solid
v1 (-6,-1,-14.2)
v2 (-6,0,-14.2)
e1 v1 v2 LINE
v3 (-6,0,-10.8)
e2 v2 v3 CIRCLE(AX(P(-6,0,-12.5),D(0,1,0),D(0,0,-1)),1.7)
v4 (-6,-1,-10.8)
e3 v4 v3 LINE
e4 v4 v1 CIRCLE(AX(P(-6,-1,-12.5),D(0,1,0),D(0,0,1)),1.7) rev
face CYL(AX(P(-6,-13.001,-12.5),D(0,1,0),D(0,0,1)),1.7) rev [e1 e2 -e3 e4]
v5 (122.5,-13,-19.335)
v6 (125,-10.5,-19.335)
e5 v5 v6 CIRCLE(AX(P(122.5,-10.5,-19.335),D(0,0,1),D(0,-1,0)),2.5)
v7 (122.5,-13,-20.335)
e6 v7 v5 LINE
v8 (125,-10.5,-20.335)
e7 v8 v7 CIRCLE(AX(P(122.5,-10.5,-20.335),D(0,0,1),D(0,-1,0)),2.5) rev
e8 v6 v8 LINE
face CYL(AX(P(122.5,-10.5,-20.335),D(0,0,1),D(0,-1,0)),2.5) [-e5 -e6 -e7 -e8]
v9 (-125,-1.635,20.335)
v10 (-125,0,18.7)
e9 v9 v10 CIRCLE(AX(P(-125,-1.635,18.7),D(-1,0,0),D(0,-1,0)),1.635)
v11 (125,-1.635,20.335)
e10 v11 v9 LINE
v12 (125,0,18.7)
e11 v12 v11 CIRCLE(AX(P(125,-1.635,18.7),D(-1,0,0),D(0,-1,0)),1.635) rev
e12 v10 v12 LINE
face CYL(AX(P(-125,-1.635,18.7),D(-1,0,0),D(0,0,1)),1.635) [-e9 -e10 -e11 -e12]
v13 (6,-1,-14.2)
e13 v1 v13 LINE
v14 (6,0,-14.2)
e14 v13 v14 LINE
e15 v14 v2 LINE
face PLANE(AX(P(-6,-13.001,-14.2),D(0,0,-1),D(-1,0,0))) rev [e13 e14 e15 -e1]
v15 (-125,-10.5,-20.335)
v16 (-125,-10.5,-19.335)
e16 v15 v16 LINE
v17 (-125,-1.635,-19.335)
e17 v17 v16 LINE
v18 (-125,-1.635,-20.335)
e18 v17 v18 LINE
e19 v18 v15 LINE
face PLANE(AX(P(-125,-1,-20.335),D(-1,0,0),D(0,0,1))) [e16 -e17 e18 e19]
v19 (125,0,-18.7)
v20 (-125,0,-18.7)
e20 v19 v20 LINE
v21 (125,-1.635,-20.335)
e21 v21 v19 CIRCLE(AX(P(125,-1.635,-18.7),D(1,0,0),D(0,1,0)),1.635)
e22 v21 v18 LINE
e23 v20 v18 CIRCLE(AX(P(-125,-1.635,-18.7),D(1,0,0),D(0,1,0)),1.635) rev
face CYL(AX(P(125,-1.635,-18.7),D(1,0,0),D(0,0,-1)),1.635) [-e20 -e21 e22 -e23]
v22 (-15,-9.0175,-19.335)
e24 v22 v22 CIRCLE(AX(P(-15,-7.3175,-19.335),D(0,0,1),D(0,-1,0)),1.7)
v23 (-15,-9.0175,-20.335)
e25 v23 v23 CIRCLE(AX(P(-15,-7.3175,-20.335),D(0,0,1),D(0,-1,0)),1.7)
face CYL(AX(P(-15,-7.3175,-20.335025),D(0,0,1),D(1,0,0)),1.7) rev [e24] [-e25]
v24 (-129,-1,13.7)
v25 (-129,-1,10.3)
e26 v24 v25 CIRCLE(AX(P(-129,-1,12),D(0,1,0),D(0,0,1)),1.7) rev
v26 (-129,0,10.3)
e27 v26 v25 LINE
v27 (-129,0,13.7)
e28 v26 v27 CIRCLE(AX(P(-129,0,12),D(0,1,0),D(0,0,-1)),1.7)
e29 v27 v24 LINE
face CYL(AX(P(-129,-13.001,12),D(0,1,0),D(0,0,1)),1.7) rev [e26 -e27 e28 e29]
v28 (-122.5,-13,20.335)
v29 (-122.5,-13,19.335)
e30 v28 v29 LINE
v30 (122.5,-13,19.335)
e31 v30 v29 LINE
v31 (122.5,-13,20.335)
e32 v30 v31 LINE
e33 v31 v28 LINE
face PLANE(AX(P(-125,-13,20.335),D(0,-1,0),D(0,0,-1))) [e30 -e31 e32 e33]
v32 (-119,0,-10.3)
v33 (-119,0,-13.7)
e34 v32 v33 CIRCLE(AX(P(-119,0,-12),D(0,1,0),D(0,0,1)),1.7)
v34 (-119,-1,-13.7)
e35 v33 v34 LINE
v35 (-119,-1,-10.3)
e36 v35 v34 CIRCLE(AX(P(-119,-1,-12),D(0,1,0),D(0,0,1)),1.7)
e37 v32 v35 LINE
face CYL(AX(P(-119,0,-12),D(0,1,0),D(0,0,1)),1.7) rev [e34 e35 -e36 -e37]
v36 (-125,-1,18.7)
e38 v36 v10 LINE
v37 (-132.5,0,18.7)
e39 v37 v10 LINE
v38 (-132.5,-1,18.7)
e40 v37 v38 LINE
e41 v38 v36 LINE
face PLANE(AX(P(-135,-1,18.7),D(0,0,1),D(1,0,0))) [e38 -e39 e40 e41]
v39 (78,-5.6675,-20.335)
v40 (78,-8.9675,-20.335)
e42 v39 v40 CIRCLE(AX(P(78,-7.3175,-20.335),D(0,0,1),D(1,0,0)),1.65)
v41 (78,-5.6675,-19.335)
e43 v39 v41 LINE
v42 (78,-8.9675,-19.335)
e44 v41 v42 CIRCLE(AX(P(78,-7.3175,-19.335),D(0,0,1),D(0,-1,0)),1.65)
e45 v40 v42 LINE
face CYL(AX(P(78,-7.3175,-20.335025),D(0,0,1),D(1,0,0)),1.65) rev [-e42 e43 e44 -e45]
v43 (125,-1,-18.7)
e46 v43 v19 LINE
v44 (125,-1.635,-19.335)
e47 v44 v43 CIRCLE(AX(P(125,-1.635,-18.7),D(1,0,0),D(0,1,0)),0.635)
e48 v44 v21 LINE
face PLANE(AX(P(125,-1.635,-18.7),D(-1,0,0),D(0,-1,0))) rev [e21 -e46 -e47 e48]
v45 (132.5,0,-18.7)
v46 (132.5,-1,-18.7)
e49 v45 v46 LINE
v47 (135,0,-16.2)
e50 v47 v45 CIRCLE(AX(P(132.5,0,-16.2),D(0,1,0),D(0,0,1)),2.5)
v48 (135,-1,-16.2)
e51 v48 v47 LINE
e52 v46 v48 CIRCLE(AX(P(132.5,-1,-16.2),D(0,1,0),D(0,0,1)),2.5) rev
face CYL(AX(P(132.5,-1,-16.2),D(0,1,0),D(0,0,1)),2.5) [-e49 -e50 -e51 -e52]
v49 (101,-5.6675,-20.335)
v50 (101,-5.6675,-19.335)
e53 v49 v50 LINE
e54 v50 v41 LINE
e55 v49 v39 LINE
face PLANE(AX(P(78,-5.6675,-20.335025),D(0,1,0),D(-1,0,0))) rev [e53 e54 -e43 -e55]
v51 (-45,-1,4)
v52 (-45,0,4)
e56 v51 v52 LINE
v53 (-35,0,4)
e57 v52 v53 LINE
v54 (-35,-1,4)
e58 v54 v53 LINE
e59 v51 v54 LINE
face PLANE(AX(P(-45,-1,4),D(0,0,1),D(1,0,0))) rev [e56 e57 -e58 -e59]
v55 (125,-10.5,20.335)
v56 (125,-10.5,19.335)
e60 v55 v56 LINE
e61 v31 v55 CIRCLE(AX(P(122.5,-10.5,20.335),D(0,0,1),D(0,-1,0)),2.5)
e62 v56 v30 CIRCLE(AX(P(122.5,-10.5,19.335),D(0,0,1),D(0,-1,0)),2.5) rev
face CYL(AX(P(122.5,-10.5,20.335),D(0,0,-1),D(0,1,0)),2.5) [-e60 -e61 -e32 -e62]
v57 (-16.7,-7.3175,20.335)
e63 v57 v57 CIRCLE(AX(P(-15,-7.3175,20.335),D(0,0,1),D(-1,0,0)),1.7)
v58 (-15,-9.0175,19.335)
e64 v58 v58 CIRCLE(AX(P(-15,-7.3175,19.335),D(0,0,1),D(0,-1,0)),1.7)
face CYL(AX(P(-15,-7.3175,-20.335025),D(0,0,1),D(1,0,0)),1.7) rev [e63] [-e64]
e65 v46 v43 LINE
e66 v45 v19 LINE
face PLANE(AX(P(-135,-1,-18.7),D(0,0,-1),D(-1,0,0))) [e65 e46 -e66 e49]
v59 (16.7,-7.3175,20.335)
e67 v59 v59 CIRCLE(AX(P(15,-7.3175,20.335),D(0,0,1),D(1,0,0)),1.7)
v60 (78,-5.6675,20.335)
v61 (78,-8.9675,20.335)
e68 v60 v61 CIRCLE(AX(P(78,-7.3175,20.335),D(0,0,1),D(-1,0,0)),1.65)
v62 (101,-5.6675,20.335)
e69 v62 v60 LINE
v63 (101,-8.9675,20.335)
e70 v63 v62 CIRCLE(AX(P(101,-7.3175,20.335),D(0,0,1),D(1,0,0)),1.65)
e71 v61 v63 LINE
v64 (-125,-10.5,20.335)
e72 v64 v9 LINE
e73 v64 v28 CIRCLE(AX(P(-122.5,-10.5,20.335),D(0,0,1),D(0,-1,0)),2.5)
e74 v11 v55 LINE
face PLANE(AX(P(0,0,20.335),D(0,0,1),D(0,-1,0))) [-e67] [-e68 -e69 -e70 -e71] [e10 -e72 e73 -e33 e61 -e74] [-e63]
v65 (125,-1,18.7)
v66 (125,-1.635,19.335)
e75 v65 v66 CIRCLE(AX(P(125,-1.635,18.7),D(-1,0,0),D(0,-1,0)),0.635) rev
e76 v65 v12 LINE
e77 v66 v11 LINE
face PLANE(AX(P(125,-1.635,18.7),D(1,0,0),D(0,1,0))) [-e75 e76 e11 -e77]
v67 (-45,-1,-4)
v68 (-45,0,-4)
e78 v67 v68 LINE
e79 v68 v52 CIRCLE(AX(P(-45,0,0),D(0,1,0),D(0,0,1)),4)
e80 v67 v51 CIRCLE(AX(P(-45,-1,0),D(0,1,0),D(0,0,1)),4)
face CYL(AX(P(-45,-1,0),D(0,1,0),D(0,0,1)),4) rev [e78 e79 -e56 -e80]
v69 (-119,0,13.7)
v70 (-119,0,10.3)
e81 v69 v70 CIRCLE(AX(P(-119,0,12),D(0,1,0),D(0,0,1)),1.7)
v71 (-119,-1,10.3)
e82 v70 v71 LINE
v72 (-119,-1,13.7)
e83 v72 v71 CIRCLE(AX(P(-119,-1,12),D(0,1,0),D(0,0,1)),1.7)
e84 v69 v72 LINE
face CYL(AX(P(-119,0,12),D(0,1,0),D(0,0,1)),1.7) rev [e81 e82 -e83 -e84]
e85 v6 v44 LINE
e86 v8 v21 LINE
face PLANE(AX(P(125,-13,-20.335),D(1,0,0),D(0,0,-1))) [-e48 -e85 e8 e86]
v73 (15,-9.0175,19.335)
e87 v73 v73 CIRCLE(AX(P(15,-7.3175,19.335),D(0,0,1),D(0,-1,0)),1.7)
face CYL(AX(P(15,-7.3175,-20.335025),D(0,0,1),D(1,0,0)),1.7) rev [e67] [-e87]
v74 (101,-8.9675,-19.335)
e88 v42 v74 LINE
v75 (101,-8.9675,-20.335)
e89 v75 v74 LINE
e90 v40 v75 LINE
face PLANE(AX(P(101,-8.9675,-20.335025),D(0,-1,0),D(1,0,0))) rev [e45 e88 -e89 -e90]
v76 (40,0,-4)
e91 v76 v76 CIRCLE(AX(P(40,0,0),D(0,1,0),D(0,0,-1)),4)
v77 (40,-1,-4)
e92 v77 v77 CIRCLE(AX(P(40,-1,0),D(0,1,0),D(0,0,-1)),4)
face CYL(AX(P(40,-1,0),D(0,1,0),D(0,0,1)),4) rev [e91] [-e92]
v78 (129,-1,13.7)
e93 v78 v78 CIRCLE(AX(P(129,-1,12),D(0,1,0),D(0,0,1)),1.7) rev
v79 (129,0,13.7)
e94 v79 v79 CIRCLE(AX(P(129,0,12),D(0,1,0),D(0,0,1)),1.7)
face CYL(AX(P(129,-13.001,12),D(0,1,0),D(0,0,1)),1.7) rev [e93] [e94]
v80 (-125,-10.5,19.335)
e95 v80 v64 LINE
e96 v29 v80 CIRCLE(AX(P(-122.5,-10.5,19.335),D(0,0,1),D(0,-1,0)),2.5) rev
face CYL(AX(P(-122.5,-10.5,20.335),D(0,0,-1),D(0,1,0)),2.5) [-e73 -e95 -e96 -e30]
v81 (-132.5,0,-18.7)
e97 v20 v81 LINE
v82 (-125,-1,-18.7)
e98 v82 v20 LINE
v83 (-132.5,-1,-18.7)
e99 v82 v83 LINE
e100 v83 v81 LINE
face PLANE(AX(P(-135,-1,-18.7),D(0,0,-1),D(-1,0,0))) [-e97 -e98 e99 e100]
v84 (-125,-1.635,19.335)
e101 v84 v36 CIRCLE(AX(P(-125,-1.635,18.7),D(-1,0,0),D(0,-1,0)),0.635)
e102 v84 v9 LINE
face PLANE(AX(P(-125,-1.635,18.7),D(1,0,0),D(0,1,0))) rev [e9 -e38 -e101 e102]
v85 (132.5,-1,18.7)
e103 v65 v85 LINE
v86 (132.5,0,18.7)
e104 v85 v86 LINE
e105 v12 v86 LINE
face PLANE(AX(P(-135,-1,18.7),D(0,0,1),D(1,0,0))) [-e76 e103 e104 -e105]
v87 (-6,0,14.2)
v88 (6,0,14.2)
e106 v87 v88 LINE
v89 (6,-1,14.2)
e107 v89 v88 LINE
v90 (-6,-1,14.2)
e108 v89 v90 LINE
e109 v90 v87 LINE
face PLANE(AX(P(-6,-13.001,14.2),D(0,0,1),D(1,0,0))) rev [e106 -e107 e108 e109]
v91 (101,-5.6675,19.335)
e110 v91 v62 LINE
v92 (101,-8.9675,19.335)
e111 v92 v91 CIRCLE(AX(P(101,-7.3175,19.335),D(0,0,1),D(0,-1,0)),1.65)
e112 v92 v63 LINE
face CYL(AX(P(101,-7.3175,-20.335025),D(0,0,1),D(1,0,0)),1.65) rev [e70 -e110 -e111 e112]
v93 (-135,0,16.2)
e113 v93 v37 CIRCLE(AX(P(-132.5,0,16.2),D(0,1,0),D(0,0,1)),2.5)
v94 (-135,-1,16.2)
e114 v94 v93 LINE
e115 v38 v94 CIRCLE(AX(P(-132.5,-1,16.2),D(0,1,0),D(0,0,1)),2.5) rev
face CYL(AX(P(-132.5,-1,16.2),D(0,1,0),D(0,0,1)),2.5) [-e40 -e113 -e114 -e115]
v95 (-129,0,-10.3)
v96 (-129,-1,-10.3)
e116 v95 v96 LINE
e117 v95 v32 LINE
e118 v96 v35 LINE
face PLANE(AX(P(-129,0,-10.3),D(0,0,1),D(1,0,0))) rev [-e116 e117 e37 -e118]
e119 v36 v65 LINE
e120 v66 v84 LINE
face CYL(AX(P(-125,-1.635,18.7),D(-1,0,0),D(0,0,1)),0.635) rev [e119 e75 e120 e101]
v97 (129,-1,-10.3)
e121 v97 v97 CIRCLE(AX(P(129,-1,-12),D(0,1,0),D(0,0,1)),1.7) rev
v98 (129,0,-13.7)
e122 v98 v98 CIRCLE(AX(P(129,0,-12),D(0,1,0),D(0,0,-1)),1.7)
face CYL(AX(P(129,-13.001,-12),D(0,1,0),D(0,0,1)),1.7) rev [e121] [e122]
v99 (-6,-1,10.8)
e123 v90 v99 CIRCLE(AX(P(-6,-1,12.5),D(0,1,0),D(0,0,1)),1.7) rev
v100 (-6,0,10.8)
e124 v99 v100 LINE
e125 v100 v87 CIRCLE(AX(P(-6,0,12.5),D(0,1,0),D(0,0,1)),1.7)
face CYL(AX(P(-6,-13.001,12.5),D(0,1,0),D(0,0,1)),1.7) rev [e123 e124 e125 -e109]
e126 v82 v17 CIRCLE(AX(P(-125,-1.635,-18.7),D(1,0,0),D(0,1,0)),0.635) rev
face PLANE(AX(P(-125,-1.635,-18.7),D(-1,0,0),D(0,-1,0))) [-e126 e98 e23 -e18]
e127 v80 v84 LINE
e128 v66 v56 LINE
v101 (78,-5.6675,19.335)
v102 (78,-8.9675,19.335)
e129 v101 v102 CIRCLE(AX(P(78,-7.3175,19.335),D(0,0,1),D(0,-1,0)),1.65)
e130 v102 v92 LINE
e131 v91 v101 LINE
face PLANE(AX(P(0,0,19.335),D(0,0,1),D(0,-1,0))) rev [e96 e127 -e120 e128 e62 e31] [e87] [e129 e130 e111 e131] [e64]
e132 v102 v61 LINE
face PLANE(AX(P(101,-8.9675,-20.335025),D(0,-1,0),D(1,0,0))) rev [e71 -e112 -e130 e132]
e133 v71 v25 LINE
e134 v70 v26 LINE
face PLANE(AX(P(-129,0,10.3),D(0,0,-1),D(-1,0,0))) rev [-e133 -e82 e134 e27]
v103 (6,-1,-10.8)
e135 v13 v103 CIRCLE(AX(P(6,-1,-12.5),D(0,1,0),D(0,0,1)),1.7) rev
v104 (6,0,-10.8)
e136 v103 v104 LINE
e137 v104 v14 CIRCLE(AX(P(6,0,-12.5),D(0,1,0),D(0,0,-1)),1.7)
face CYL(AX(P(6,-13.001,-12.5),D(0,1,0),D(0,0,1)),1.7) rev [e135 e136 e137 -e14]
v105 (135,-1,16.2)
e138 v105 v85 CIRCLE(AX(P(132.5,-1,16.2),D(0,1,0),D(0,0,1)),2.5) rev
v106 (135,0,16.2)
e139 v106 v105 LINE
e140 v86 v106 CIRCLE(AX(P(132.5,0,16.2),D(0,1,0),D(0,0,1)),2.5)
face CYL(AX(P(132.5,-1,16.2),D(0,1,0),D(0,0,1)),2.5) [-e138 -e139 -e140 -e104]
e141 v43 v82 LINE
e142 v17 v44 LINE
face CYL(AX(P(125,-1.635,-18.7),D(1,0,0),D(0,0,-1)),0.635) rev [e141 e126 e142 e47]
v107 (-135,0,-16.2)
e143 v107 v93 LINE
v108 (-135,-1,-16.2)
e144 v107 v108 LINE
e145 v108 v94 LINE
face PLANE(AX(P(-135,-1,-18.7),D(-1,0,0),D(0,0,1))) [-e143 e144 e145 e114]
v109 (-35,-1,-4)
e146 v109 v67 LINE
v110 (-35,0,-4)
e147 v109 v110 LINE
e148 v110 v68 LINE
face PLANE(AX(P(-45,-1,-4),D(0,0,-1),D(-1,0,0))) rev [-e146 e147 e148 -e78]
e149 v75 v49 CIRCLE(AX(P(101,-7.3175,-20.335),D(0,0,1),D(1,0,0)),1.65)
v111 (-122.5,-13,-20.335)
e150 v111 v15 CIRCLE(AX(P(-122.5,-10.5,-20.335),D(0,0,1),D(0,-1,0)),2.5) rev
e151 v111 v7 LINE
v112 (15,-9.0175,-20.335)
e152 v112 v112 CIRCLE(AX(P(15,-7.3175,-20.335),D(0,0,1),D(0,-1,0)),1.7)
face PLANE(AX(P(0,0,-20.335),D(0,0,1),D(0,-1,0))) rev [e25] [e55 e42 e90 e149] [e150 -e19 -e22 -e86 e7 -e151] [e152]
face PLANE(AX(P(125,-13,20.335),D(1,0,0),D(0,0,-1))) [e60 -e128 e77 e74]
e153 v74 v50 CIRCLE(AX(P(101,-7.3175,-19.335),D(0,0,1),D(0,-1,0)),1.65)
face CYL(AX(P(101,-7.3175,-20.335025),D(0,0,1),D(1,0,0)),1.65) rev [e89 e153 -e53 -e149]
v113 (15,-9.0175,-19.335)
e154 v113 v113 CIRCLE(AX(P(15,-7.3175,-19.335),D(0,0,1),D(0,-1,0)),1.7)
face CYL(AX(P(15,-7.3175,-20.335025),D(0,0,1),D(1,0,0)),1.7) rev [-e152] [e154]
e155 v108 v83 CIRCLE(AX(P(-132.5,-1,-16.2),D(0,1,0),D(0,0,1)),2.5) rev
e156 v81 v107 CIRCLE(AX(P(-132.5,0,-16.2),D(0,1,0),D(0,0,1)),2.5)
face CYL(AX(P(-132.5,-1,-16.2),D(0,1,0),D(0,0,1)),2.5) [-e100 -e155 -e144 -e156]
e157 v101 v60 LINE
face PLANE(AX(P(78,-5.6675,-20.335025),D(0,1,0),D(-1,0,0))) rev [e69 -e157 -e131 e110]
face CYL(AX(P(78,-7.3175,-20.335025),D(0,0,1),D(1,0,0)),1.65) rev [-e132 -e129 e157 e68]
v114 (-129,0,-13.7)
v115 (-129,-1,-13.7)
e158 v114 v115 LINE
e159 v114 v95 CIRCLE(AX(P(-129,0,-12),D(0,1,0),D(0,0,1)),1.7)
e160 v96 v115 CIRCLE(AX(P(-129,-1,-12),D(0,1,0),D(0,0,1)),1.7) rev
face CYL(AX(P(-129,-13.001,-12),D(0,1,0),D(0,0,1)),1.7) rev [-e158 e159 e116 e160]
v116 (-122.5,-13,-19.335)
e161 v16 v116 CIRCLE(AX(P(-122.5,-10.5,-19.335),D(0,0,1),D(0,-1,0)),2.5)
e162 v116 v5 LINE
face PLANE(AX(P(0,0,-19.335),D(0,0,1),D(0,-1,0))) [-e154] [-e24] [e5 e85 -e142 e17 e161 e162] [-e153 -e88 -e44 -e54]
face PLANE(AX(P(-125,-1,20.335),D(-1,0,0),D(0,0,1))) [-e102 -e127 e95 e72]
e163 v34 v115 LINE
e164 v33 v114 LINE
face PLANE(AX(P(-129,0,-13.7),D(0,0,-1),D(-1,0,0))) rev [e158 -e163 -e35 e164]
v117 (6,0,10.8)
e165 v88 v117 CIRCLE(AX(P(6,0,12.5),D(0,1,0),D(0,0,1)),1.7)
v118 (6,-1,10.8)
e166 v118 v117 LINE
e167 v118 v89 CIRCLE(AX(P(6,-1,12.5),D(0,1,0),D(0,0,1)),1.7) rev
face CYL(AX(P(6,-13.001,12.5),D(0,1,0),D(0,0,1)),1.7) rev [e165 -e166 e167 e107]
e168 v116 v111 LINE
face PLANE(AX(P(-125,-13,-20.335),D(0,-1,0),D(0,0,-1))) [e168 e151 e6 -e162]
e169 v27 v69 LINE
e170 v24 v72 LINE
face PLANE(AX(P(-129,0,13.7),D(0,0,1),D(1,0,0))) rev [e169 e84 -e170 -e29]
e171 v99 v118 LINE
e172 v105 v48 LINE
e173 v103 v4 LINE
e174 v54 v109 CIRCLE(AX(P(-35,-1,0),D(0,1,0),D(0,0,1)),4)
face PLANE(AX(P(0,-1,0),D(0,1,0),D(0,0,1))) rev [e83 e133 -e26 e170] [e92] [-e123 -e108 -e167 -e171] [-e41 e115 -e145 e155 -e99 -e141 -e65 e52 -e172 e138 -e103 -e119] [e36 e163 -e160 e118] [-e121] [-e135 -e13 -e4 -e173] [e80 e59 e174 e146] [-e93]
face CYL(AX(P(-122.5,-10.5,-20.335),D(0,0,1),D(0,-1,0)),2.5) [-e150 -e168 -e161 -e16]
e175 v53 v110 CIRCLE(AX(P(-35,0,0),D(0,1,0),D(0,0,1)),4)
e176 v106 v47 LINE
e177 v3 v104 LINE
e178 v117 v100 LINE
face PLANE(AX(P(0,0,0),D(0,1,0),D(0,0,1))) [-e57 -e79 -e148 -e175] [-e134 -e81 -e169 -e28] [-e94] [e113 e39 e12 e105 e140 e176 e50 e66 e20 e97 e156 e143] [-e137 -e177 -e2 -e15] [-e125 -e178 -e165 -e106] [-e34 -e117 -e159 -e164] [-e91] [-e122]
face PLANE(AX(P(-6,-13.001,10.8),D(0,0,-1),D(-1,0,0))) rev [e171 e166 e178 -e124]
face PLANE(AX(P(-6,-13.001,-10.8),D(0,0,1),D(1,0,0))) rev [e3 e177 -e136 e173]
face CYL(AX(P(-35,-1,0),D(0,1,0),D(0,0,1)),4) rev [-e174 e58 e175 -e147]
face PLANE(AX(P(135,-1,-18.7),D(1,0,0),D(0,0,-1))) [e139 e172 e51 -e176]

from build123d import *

# Parameters (mm, degrees)
SKETCH1_W               = 270
SKETCH1_H               = 37.4
BASE_FLANGE1_DEPTH      = 1
SKETCH4_R               = 4
CUT_EXTRUDE1_DEPTH      = 137.292663045
CUT_EXTRUDE2_DEPTH      = 1
EDGE_FLANGE1_DEPTH      = 250
EDGE_FLANGE1_BEND_DEPTH = 250
CUT_EXTRUDE3_REACH      = 139.14
SKETCH13_R              = 1.7
CUT_EXTRUDE4_DEPTH      = 142.591132844
BREAK_CORNER1_START     = -20.335
BREAK_CORNER1_DEPTH     = 40.67
BREAK_CORNER1_START_2   = -1
BREAK_CORNER1_2_DEPTH   = 1
CUT_EXTRUDE5_REACH      = 139.14
SKETCH16_R              = 1.7
CUT_EXTRUDE6_DEPTH      = 142.591132844
CUT_EXTRUDE7_DEPTH      = 1


# Read off the part's stored shape, not the designer's step: Break-Corner1
# Sheet-metal steps are written as plain solids
with BuildPart() as part:
    # Sketch1 → Base-Flange1 (new body)
    with BuildSketch(Plane(origin=(0, 0, 0), x_dir=(1, 0, 0), z_dir=(0, 1, 0))):
        Rectangle(SKETCH1_W, SKETCH1_H)
    extrude(amount=-BASE_FLANGE1_DEPTH)

    # Sketch4 → Cut-Extrude1 (cut, through all)
    with BuildSketch(Plane(origin=(0, 0, 0), x_dir=(1, 0, 0), z_dir=(0, 1, 0))):
        with Locations(Location((-40, 0, 0), (0, 0, 270))):
            Circle(SKETCH4_R)
        with Locations(Location((40, 0, 0), (0, 0, 90))):
            Circle(SKETCH4_R)
    extrude(amount=-CUT_EXTRUDE1_DEPTH, mode=Mode.SUBTRACT)

    # Sketch6 → Cut-Extrude2 (cut)
    with BuildSketch(Plane(origin=(0, 0, 0), x_dir=(1, 0, 0), z_dir=(0, 1, 0))):
        with BuildLine():
            Line((-45, 4), (-35, 4))
            ThreePointArc((-35, 4), (-31, 0), (-35, -4))
            Line((-35, -4), (-45, -4))
            ThreePointArc((-45, -4), (-49, 0), (-45, 4))
        make_face()
    extrude(amount=-CUT_EXTRUDE2_DEPTH, mode=Mode.SUBTRACT)

    # Edge-Flange1 section (across the edge) → Edge-Flange1 (add)
    with BuildSketch(Plane(origin=(125, -1, 19.335), x_dir=(0, 0, -1), z_dir=(-1, 0, 0))):
        with BuildLine():
            Line((-1, 0.635), (-1, 12))
            Line((-1, 12), (0, 12))
            Line((0, 12), (0, 0.635))
            ThreePointArc((0, 0.635), (0.185987194, 0.185987194), (0.635, 0))
            Line((0.635, 0), (0.635, -1))
            ThreePointArc((0.635, -1), (-0.521119587, -0.521119587), (-1, 0.635))
        make_face()
    extrude(amount=EDGE_FLANGE1_DEPTH)

    # Edge-Flange1 section 2 (across the edge) → Edge-Flange1 bend (add)
    with BuildSketch(Plane(origin=(-125, -1, -19.335), x_dir=(0, 0, 1), z_dir=(1, 0, 0))):
        with BuildLine():
            Line((-1, 0.635), (-1, 12))
            Line((-1, 12), (0, 12))
            Line((0, 12), (0, 0.635))
            ThreePointArc((0, 0.635), (0.185987194, 0.185987194), (0.635, 0))
            Line((0.635, 0), (0.635, -1))
            ThreePointArc((0.635, -1), (-0.521119587, -0.521119587), (-1, 0.635))
        make_face()
    extrude(amount=EDGE_FLANGE1_BEND_DEPTH)

    # Sketch13 → Cut-Extrude3 (cut, up to next)
    with BuildSketch(Plane(origin=(0, 0, 0), x_dir=(1, 0, 0), z_dir=(0, 1, 0)), mode=Mode.PRIVATE) as cut_extrude3_sk1:
        with Locations(Location((-129, 12, 0), (0, 0, 270))):
            Circle(SKETCH13_R)
    cut_extrude3_tool1 = extrude(cut_extrude3_sk1.sketch, amount=-CUT_EXTRUDE3_REACH, mode=Mode.PRIVATE) & part.part
    # Sketch13 → Cut-Extrude3 (cut, up to next)
    with BuildSketch(Plane(origin=(0, 0, 0), x_dir=(1, 0, 0), z_dir=(0, 1, 0)), mode=Mode.PRIVATE) as cut_extrude3_sk2:
        with Locations(Location((-129, -12, 0), (0, 0, 270))):
            Circle(SKETCH13_R)
    cut_extrude3_tool2 = extrude(cut_extrude3_sk2.sketch, amount=-CUT_EXTRUDE3_REACH, mode=Mode.PRIVATE) & part.part
    # Sketch13 → Cut-Extrude3 (cut, up to next)
    with BuildSketch(Plane(origin=(0, 0, 0), x_dir=(1, 0, 0), z_dir=(0, 1, 0)), mode=Mode.PRIVATE) as cut_extrude3_sk3:
        with Locations(Location((129, -12, 0), (0, 0, 270))):
            Circle(SKETCH13_R)
    cut_extrude3_tool3 = extrude(cut_extrude3_sk3.sketch, amount=-CUT_EXTRUDE3_REACH, mode=Mode.PRIVATE) & part.part
    # Sketch13 → Cut-Extrude3 (cut, up to next)
    with BuildSketch(Plane(origin=(0, 0, 0), x_dir=(1, 0, 0), z_dir=(0, 1, 0)), mode=Mode.PRIVATE) as cut_extrude3_sk4:
        with Locations(Location((129, 12, 0), (0, 0, 270))):
            Circle(SKETCH13_R)
    cut_extrude3_tool4 = extrude(cut_extrude3_sk4.sketch, amount=-CUT_EXTRUDE3_REACH, mode=Mode.PRIVATE) & part.part
    add(cut_extrude3_tool1.solids().sort_by_distance((-129, 0, -12))[0], mode=Mode.SUBTRACT)
    add(cut_extrude3_tool2.solids().sort_by_distance((-129, 0, 12))[0], mode=Mode.SUBTRACT)
    add(cut_extrude3_tool3.solids().sort_by_distance((129, 0, 12))[0], mode=Mode.SUBTRACT)
    add(cut_extrude3_tool4.solids().sort_by_distance((129, 0, -12))[0], mode=Mode.SUBTRACT)

    # Sketch14 → Cut-Extrude4 (cut, through all)
    with BuildSketch(Plane.XY.offset(20.335)):
        with BuildLine():
            Line((78, -5.6675), (101, -5.6675))
            ThreePointArc((101, -5.6675), (102.65, -7.3175), (101, -8.9675))
            Line((101, -8.9675), (78, -8.9675))
            ThreePointArc((78, -8.9675), (76.35, -7.3175), (78, -5.6675))
        make_face()
    extrude(amount=-CUT_EXTRUDE4_DEPTH, mode=Mode.SUBTRACT)

    # Break-Corner1 outline → Break-Corner1 (cut)
    with BuildSketch(Plane.XY.offset(BREAK_CORNER1_START)):
        with BuildLine():
            Line((-125, -13), (-122.5, -13))
            ThreePointArc((-122.5, -13), (-124.267766953, -12.267766953), (-125, -10.5))
            Line((-125, -10.5), (-125, -13))
        make_face()
        with BuildLine():
            ThreePointArc((125, -10.5), (124.267766953, -12.267766953), (122.5, -13))
            Line((122.5, -13), (125, -13))
            Line((125, -13), (125, -10.5))
        make_face()
    extrude(amount=BREAK_CORNER1_DEPTH, mode=Mode.SUBTRACT)

    # Break-Corner1 2 outline → Break-Corner1 2 (cut)
    with BuildSketch(Plane(origin=(0, 0, 0), x_dir=(1, 0, 0), z_dir=(0, 1, 0)).offset(BREAK_CORNER1_START_2)):
        with BuildLine():
            ThreePointArc((132.5, 18.7), (134.267766953, 17.967766953), (135, 16.2))
            Line((135, 16.2), (135, 18.7))
            Line((135, 18.7), (132.5, 18.7))
        make_face()
        with BuildLine():
            ThreePointArc((135, -16.2), (134.267766953, -17.967766953), (132.5, -18.7))
            Line((132.5, -18.7), (135, -18.7))
            Line((135, -18.7), (135, -16.2))
        make_face()
        with BuildLine():
            Line((-135, 18.7), (-135, 16.2))
            ThreePointArc((-135, 16.2), (-134.267766953, 17.967766953), (-132.5, 18.7))
            Line((-132.5, 18.7), (-135, 18.7))
        make_face()
        with BuildLine():
            ThreePointArc((-132.5, -18.7), (-134.267766953, -17.967766953), (-135, -16.2))
            Line((-135, -16.2), (-135, -18.7))
            Line((-135, -18.7), (-132.5, -18.7))
        make_face()
    extrude(amount=BREAK_CORNER1_2_DEPTH, mode=Mode.SUBTRACT)

    # Sketch15 → Cut-Extrude5 (cut, up to next)
    with BuildSketch(Plane(origin=(0, 0, 0), x_dir=(1, 0, 0), z_dir=(0, 1, 0)), mode=Mode.PRIVATE) as cut_extrude5_sk1:
        with BuildLine():
            Line((-6, -10.8), (6, -10.8))
            ThreePointArc((6, -10.8), (7.7, -12.5), (6, -14.2))
            Line((6, -14.2), (-6, -14.2))
            ThreePointArc((-6, -14.2), (-7.7, -12.5), (-6, -10.8))
        make_face()
    cut_extrude5_tool1 = extrude(cut_extrude5_sk1.sketch, amount=-CUT_EXTRUDE5_REACH, mode=Mode.PRIVATE) & part.part
    # Sketch15 → Cut-Extrude5 (cut, up to next)
    with BuildSketch(Plane(origin=(0, 0, 0), x_dir=(1, 0, 0), z_dir=(0, 1, 0)), mode=Mode.PRIVATE) as cut_extrude5_sk2:
        with BuildLine():
            Line((-6, 10.8), (6, 10.8))
            ThreePointArc((6, 10.8), (7.7, 12.5), (6, 14.2))
            Line((6, 14.2), (-6, 14.2))
            ThreePointArc((-6, 14.2), (-7.7, 12.5), (-6, 10.8))
        make_face()
    cut_extrude5_tool2 = extrude(cut_extrude5_sk2.sketch, amount=-CUT_EXTRUDE5_REACH, mode=Mode.PRIVATE) & part.part
    add(cut_extrude5_tool1.solids().sort_by_distance((0, 0, 12.5))[0], mode=Mode.SUBTRACT)
    add(cut_extrude5_tool2.solids().sort_by_distance((0, 0, -12.5))[0], mode=Mode.SUBTRACT)

    # Sketch16 → Cut-Extrude6 (cut, through all)
    with BuildSketch(Plane.XY.offset(20.335)):
        with Locations(Location((15, -7.3175, 0), (0, 0, 270))):
            Circle(SKETCH16_R)
        with Locations(Location((-15, -7.3175, 0), (0, 0, 270))):
            Circle(SKETCH16_R)
    extrude(amount=-CUT_EXTRUDE6_DEPTH, mode=Mode.SUBTRACT)

    # Sketch17 → Cut-Extrude7 (cut)
    with BuildSketch(Plane(origin=(0, 0, 0), x_dir=(1, 0, 0), z_dir=(0, 1, 0))):
        with BuildLine():
            Line((-129, -10.3), (-119, -10.3))
            ThreePointArc((-119, -10.3), (-117.3, -12), (-119, -13.7))
            Line((-119, -13.7), (-129, -13.7))
            ThreePointArc((-129, -13.7), (-130.7, -12), (-129, -10.3))
        make_face()
        with BuildLine():
            Line((-129, 13.7), (-119, 13.7))
            ThreePointArc((-119, 13.7), (-117.3, 12), (-119, 10.3))
            Line((-119, 10.3), (-129, 10.3))
            ThreePointArc((-129, 10.3), (-130.7, 12), (-129, 13.7))
        make_face()
    extrude(amount=-CUT_EXTRUDE7_DEPTH, mode=Mode.SUBTRACT)


solid = part.part
